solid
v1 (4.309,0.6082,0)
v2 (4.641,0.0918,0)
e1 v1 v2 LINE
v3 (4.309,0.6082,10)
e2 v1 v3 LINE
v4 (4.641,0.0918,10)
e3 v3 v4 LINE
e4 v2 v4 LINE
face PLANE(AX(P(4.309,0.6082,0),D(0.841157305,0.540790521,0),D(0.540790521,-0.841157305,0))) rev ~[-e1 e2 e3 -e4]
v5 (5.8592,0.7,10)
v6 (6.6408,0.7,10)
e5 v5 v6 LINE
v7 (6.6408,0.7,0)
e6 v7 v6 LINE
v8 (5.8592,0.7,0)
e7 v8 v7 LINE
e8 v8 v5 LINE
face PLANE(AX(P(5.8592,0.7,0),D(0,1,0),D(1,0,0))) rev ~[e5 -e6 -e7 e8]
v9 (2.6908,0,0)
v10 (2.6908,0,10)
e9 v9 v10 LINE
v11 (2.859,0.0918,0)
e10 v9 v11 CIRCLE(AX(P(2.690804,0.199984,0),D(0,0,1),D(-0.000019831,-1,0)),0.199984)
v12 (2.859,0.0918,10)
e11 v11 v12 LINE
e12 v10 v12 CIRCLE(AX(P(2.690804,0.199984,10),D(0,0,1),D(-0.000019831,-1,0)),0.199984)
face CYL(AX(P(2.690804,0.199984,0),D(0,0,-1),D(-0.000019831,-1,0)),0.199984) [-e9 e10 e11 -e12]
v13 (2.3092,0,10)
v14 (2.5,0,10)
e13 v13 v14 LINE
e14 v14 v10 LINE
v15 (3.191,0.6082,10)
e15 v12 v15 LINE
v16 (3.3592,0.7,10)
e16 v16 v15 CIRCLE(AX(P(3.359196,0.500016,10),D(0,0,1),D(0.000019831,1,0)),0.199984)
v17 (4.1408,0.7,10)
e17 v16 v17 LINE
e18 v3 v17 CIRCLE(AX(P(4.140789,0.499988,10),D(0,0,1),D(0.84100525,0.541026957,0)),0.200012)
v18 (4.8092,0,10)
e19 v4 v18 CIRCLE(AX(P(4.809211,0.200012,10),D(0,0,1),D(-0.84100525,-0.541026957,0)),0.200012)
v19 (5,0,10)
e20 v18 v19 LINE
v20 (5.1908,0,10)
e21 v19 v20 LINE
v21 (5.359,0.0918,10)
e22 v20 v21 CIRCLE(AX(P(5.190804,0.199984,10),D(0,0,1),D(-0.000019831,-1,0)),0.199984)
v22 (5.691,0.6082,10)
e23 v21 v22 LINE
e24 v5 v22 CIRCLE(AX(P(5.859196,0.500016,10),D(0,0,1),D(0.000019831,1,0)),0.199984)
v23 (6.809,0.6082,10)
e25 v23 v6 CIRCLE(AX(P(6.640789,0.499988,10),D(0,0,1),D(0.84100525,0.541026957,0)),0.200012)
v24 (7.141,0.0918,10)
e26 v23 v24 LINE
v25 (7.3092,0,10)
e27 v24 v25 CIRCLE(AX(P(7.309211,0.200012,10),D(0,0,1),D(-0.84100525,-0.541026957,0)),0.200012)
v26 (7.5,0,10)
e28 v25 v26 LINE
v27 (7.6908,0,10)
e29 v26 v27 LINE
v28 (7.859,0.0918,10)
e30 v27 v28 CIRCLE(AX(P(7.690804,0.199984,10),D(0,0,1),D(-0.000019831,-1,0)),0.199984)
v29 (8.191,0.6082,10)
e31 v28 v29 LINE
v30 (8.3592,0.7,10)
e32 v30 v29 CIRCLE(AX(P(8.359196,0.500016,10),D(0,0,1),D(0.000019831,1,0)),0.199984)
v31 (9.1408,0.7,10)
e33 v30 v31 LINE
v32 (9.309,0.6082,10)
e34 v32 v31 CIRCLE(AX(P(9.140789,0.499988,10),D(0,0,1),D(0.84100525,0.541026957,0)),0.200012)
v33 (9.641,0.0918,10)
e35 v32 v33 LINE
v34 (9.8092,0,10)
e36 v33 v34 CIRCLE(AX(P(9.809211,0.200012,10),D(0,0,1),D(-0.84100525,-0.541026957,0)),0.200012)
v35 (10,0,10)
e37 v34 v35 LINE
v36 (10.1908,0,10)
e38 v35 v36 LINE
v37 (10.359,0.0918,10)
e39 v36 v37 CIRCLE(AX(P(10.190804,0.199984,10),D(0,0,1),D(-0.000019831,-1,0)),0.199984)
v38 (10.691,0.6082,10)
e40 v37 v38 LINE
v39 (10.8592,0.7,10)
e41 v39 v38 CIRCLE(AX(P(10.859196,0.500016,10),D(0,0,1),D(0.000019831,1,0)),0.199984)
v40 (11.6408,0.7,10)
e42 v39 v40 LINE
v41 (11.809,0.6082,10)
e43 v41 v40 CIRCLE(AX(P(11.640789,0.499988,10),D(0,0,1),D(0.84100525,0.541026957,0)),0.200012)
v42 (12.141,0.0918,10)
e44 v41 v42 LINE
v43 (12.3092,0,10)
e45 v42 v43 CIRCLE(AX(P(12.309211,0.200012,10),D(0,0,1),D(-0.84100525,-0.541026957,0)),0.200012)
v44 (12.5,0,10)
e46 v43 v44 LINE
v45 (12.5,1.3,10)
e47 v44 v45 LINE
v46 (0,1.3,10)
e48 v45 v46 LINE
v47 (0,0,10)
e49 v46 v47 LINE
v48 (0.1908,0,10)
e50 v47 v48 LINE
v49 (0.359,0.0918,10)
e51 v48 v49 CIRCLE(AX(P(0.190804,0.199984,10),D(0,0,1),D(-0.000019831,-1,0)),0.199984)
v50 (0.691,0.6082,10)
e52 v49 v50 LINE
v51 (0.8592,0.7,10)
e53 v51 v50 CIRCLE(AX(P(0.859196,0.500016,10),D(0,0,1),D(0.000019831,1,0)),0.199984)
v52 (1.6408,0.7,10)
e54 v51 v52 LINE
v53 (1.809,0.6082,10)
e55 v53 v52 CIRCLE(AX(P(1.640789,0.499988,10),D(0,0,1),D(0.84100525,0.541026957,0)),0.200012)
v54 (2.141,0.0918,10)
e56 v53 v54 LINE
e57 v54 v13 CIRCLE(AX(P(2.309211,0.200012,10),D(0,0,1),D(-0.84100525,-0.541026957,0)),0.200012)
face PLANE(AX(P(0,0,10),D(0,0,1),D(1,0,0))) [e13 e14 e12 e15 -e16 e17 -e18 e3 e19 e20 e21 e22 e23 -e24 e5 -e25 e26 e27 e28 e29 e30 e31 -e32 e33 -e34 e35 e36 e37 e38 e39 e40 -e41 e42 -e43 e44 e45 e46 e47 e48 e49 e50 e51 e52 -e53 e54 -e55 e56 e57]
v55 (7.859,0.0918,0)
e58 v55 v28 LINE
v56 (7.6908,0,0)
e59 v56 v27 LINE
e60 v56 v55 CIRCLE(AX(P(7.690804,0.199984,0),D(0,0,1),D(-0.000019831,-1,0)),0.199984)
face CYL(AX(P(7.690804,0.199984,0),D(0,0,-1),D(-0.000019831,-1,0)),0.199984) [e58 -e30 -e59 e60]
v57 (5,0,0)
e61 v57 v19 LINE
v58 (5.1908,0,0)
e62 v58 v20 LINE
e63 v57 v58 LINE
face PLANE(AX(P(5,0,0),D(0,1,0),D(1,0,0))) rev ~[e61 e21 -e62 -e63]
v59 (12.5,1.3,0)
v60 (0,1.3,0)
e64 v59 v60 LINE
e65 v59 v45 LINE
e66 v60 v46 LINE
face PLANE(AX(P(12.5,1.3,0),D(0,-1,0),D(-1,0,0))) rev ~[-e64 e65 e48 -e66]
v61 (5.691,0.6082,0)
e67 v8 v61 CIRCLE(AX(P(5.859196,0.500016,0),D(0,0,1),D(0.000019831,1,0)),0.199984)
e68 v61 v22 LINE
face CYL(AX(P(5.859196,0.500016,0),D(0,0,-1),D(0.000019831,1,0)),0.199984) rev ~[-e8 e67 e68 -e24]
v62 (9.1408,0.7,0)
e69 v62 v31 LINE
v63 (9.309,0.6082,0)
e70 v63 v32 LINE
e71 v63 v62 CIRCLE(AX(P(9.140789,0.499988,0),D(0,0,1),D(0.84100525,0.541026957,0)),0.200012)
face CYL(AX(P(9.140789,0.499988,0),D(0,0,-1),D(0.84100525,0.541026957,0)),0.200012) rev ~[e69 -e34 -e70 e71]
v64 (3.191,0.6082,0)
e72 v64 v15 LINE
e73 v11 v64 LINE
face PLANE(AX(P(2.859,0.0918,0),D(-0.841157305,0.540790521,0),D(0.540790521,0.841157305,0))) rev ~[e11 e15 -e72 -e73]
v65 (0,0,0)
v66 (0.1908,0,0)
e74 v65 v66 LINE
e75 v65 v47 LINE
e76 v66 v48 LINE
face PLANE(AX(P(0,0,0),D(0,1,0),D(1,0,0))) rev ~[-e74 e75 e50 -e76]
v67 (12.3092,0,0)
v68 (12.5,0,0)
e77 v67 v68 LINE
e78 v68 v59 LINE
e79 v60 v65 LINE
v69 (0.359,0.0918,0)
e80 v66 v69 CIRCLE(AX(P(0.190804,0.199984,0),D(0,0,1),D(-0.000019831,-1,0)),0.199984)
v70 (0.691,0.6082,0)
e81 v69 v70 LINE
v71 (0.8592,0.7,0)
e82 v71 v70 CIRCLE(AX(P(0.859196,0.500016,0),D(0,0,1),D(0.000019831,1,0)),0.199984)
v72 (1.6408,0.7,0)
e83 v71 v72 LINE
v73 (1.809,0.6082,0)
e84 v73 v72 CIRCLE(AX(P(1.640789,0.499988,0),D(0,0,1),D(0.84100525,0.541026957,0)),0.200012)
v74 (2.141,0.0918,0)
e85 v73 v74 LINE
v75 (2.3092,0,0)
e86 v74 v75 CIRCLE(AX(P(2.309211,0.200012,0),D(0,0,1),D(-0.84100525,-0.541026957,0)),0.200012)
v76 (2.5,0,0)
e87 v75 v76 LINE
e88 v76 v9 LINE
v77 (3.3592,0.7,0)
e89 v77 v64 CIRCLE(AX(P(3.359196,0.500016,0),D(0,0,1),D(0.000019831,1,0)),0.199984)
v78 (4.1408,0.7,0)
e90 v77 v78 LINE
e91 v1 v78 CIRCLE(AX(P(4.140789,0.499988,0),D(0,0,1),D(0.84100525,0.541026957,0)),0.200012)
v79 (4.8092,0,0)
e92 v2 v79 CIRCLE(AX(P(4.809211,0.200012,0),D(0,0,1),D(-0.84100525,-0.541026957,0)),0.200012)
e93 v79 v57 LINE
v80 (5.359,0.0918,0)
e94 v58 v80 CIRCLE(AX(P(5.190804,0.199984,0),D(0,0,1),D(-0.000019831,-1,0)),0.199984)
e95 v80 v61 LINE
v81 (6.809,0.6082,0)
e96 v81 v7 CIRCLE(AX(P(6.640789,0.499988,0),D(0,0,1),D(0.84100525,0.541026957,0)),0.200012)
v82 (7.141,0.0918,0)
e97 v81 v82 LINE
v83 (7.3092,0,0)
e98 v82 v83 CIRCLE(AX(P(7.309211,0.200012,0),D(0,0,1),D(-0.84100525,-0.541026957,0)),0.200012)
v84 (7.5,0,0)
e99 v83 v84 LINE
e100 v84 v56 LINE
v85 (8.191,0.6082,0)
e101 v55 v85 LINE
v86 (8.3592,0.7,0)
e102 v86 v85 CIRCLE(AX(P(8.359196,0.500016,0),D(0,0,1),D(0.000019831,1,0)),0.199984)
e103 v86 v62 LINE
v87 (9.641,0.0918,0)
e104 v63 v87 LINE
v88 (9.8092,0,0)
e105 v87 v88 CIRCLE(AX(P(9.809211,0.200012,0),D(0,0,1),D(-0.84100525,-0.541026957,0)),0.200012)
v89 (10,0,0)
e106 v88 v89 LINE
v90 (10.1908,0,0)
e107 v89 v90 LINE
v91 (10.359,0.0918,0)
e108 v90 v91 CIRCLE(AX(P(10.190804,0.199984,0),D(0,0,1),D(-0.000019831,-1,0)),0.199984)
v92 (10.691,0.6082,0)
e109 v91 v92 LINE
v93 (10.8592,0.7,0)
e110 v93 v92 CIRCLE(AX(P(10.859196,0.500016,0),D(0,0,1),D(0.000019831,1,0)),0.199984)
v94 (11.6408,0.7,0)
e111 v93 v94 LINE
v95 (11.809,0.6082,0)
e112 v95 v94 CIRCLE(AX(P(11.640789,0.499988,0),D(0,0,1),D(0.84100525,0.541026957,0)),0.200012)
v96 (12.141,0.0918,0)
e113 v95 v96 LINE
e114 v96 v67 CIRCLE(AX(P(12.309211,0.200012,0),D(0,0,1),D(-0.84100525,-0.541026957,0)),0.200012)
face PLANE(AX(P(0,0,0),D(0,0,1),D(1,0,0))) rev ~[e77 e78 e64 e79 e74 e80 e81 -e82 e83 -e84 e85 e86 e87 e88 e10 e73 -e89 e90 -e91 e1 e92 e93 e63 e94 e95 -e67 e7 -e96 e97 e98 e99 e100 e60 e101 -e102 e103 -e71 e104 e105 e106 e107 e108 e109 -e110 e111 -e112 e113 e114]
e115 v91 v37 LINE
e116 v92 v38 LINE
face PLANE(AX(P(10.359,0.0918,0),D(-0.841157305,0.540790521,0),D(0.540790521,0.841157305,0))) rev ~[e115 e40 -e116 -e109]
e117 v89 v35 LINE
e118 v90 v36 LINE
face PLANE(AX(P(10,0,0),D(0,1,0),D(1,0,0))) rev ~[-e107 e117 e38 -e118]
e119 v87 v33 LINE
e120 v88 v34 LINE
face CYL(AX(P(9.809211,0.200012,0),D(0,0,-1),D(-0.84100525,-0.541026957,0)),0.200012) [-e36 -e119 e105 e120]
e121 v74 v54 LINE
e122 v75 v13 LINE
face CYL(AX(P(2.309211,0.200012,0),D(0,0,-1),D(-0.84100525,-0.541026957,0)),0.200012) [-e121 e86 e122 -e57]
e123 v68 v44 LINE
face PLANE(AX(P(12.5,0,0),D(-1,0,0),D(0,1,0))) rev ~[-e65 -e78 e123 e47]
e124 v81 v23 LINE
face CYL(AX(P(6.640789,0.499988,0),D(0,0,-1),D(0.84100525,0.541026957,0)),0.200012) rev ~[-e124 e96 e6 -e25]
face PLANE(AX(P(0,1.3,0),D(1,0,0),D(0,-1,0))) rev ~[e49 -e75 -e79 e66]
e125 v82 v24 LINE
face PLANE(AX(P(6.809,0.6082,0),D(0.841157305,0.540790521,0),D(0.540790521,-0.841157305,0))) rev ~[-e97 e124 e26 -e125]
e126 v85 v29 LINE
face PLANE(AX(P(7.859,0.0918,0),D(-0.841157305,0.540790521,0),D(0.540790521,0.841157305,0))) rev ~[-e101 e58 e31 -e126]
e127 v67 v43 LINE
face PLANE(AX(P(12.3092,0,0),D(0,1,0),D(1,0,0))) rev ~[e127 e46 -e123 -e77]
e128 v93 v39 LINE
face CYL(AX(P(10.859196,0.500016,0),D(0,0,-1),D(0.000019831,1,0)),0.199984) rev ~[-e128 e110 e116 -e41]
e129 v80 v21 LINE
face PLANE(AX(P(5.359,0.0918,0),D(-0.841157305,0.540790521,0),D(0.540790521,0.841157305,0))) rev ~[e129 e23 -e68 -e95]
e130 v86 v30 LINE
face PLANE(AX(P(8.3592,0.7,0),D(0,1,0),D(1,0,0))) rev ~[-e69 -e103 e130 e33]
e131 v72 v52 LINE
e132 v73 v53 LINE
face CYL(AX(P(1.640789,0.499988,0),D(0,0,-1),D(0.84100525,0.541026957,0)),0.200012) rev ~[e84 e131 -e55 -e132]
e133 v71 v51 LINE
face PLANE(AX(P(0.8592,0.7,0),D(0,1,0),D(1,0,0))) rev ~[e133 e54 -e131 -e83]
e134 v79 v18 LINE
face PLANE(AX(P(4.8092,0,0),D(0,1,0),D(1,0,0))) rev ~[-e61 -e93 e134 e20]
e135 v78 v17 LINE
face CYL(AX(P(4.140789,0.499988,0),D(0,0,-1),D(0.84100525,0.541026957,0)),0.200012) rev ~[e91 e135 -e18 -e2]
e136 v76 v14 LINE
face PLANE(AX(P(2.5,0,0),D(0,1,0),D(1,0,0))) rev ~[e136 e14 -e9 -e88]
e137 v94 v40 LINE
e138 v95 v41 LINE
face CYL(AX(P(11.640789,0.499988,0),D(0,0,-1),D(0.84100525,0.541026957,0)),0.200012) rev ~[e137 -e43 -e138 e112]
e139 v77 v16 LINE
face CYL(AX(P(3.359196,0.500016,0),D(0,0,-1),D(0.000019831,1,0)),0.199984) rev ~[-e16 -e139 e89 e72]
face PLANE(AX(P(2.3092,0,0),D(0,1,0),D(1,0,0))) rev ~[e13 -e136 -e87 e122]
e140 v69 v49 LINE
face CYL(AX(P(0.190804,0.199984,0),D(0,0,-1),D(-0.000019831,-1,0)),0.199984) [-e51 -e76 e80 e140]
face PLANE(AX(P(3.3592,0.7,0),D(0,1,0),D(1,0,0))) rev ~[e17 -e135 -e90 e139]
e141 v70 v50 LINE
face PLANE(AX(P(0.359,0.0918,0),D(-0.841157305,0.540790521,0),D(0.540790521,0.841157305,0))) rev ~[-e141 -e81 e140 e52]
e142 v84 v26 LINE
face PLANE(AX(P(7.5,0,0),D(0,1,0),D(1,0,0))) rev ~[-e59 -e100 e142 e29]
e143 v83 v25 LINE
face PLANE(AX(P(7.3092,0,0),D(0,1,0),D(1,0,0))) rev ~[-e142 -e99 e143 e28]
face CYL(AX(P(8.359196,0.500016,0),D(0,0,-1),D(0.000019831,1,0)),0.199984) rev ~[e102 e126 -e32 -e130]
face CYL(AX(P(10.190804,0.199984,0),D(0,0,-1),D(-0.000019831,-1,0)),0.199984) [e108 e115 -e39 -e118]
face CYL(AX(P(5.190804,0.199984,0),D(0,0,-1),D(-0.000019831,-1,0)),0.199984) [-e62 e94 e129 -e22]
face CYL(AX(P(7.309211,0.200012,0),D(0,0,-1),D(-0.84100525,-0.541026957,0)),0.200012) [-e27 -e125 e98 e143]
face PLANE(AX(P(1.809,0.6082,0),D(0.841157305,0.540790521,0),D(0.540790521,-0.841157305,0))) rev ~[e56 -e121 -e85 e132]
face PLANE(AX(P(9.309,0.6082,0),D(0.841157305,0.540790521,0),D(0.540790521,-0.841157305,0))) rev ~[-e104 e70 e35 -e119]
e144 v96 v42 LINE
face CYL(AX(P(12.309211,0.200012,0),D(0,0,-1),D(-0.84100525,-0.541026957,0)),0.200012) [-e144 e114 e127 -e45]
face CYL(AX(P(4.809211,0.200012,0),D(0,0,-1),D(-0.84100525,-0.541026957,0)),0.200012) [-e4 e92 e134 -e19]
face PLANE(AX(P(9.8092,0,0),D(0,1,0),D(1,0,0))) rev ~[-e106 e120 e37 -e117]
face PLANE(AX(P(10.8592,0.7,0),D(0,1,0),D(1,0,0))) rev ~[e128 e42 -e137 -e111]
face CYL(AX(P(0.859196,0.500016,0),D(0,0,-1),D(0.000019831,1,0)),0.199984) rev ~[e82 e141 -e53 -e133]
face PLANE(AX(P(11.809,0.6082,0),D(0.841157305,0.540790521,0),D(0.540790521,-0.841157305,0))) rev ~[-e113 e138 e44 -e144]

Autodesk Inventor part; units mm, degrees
ref_plane "YZ Plane" through (0, 0, 0) normal (1, 0, 0) x (0, 1, 0)
ref_plane "XZ Plane" through (0, 0, 0) normal (0, 1, 0) x (-1, 0, 0)
ref_plane "XY Plane" through (0, 0, 0) normal (0, 0, 1) x (1, 0, 0)
sketch "Sketch1" plane through (0, 0, 0) normal (0, 0, 1) x (1, 0, 0)
  line L0 (10, 0) -> (10.1908, 0)
  line L1 (10.359, 0.0918) -> (10.691, 0.6082)
  line L2 (11.809, 0.6082) -> (12.141, 0.0918)
  line L3 (10.8592, 0.7) -> (11.6408, 0.7)
  arc A0 (11.809, 0.6082) -> (11.6408, 0.7) centre (11.6408, 0.5) ccw
  arc A1 (10.8592, 0.7) -> (10.691, 0.6082) centre (10.8592, 0.5) ccw
  line L4 (12.3092, 0) -> (12.5, 0)
  arc A2 (10.1908, 0) -> (10.359, 0.0918) centre (10.1908, 0.2) ccw
  arc A3 (12.141, 0.0918) -> (12.3092, 0) centre (12.3092, 0.2) ccw
  line L5 (7.5, 0) -> (7.6908, 0)
  line L6 (7.859, 0.0918) -> (8.191, 0.6082)
  line L7 (9.309, 0.6082) -> (9.641, 0.0918)
  line L8 (8.3592, 0.7) -> (9.1408, 0.7)
  arc A4 (9.309, 0.6082) -> (9.1408, 0.7) centre (9.1408, 0.5) ccw
  arc A5 (8.3592, 0.7) -> (8.191, 0.6082) centre (8.3592, 0.5) ccw
  line L9 (9.8092, 0) -> (10, 0)
  arc A6 (7.6908, 0) -> (7.859, 0.0918) centre (7.6908, 0.2) ccw
  arc A7 (9.641, 0.0918) -> (9.8092, 0) centre (9.8092, 0.2) ccw
  line L10 (5, 0) -> (5.1908, 0)
  line L11 (5.359, 0.0918) -> (5.691, 0.6082)
  line L12 (6.809, 0.6082) -> (7.141, 0.0918)
  line L13 (5.8592, 0.7) -> (6.6408, 0.7)
  arc A8 (6.809, 0.6082) -> (6.6408, 0.7) centre (6.6408, 0.5) ccw
  arc A9 (5.8592, 0.7) -> (5.691, 0.6082) centre (5.8592, 0.5) ccw
  line L14 (7.3092, 0) -> (7.5, 0)
  arc A10 (5.1908, 0) -> (5.359, 0.0918) centre (5.1908, 0.2) ccw
  arc A11 (7.141, 0.0918) -> (7.3092, 0) centre (7.3092, 0.2) ccw
  line L15 (2.5, 0) -> (2.6908, 0)
  line L16 (2.859, 0.0918) -> (3.191, 0.6082)
  line L17 (4.309, 0.6082) -> (4.641, 0.0918)
  line L18 (3.3592, 0.7) -> (4.1408, 0.7)
  arc A12 (4.309, 0.6082) -> (4.1408, 0.7) centre (4.1408, 0.5) ccw
  arc A13 (3.3592, 0.7) -> (3.191, 0.6082) centre (3.3592, 0.5) ccw
  line L19 (4.8092, 0) -> (5, 0)
  arc A14 (2.6908, 0) -> (2.859, 0.0918) centre (2.6908, 0.2) ccw
  arc A15 (4.641, 0.0918) -> (4.8092, 0) centre (4.8092, 0.2) ccw
  line L20 (0, 0) -> (0.1908, 0)
  line L21 (0.359, 0.0918) -> (0.691, 0.6082)
  line L22 (1.809, 0.6082) -> (2.141, 0.0918)
  line L23 (0.8592, 0.7) -> (1.6408, 0.7)
  arc A16 (1.809, 0.6082) -> (1.6408, 0.7) centre (1.6408, 0.5) ccw
  arc A17 (0.8592, 0.7) -> (0.691, 0.6082) centre (0.8592, 0.5) ccw
  line L24 (2.3092, 0) -> (2.5, 0)
  arc A18 (0.1908, 0) -> (0.359, 0.0918) centre (0.1908, 0.2) ccw
  arc A19 (2.141, 0.0918) -> (2.3092, 0) centre (2.3092, 0.2) ccw
  line L25 (12.5, 0) -> (12.5, 1.3)
  line L26 (12.5, 1.3) -> (0, 1.3)
  line L27 (0, 1.3) -> (0, 0)
  line L28 (7.3092, 0) -> (7.6908, 0)
  line L29 (9.8092, 0) -> (10.1908, 0)
  line L30 (12.3092, 0) -> (12.5, 0)
  line L31 (4.8092, 0) -> (5.1908, 0)
  line L32 (0, 0) -> (0.1908, 0)
  line L33 (2.3092, 0) -> (2.6908, 0)
  point P0 (0, 0)
  point P1 (10.3, 0)
  point P2 (12.2, 0)
  point P3 (7.8, 0)
  point P4 (9.7, 0)
  point P5 (5.3, 0)
  point P6 (7.2, 0)
  point P7 (2.8, 0)
  point P8 (4.7, 0)
  point P9 (0.3, 0)
  point P10 (2.2, 0)
  dimension "d14" = 10
  dimension "d5" = 0.3
  dimension "d7" = 0.2
  dimension "d8" = 0.2
  dimension "d11" = 2.5
  dimension "d16" = 1.3
extrude "Extrusion1" add sketch "Sketch1" along normal blind 10
pattern_of_one "Rectangular Pattern1"
properties part number "T2.5 belt-01" material "Rubber"
